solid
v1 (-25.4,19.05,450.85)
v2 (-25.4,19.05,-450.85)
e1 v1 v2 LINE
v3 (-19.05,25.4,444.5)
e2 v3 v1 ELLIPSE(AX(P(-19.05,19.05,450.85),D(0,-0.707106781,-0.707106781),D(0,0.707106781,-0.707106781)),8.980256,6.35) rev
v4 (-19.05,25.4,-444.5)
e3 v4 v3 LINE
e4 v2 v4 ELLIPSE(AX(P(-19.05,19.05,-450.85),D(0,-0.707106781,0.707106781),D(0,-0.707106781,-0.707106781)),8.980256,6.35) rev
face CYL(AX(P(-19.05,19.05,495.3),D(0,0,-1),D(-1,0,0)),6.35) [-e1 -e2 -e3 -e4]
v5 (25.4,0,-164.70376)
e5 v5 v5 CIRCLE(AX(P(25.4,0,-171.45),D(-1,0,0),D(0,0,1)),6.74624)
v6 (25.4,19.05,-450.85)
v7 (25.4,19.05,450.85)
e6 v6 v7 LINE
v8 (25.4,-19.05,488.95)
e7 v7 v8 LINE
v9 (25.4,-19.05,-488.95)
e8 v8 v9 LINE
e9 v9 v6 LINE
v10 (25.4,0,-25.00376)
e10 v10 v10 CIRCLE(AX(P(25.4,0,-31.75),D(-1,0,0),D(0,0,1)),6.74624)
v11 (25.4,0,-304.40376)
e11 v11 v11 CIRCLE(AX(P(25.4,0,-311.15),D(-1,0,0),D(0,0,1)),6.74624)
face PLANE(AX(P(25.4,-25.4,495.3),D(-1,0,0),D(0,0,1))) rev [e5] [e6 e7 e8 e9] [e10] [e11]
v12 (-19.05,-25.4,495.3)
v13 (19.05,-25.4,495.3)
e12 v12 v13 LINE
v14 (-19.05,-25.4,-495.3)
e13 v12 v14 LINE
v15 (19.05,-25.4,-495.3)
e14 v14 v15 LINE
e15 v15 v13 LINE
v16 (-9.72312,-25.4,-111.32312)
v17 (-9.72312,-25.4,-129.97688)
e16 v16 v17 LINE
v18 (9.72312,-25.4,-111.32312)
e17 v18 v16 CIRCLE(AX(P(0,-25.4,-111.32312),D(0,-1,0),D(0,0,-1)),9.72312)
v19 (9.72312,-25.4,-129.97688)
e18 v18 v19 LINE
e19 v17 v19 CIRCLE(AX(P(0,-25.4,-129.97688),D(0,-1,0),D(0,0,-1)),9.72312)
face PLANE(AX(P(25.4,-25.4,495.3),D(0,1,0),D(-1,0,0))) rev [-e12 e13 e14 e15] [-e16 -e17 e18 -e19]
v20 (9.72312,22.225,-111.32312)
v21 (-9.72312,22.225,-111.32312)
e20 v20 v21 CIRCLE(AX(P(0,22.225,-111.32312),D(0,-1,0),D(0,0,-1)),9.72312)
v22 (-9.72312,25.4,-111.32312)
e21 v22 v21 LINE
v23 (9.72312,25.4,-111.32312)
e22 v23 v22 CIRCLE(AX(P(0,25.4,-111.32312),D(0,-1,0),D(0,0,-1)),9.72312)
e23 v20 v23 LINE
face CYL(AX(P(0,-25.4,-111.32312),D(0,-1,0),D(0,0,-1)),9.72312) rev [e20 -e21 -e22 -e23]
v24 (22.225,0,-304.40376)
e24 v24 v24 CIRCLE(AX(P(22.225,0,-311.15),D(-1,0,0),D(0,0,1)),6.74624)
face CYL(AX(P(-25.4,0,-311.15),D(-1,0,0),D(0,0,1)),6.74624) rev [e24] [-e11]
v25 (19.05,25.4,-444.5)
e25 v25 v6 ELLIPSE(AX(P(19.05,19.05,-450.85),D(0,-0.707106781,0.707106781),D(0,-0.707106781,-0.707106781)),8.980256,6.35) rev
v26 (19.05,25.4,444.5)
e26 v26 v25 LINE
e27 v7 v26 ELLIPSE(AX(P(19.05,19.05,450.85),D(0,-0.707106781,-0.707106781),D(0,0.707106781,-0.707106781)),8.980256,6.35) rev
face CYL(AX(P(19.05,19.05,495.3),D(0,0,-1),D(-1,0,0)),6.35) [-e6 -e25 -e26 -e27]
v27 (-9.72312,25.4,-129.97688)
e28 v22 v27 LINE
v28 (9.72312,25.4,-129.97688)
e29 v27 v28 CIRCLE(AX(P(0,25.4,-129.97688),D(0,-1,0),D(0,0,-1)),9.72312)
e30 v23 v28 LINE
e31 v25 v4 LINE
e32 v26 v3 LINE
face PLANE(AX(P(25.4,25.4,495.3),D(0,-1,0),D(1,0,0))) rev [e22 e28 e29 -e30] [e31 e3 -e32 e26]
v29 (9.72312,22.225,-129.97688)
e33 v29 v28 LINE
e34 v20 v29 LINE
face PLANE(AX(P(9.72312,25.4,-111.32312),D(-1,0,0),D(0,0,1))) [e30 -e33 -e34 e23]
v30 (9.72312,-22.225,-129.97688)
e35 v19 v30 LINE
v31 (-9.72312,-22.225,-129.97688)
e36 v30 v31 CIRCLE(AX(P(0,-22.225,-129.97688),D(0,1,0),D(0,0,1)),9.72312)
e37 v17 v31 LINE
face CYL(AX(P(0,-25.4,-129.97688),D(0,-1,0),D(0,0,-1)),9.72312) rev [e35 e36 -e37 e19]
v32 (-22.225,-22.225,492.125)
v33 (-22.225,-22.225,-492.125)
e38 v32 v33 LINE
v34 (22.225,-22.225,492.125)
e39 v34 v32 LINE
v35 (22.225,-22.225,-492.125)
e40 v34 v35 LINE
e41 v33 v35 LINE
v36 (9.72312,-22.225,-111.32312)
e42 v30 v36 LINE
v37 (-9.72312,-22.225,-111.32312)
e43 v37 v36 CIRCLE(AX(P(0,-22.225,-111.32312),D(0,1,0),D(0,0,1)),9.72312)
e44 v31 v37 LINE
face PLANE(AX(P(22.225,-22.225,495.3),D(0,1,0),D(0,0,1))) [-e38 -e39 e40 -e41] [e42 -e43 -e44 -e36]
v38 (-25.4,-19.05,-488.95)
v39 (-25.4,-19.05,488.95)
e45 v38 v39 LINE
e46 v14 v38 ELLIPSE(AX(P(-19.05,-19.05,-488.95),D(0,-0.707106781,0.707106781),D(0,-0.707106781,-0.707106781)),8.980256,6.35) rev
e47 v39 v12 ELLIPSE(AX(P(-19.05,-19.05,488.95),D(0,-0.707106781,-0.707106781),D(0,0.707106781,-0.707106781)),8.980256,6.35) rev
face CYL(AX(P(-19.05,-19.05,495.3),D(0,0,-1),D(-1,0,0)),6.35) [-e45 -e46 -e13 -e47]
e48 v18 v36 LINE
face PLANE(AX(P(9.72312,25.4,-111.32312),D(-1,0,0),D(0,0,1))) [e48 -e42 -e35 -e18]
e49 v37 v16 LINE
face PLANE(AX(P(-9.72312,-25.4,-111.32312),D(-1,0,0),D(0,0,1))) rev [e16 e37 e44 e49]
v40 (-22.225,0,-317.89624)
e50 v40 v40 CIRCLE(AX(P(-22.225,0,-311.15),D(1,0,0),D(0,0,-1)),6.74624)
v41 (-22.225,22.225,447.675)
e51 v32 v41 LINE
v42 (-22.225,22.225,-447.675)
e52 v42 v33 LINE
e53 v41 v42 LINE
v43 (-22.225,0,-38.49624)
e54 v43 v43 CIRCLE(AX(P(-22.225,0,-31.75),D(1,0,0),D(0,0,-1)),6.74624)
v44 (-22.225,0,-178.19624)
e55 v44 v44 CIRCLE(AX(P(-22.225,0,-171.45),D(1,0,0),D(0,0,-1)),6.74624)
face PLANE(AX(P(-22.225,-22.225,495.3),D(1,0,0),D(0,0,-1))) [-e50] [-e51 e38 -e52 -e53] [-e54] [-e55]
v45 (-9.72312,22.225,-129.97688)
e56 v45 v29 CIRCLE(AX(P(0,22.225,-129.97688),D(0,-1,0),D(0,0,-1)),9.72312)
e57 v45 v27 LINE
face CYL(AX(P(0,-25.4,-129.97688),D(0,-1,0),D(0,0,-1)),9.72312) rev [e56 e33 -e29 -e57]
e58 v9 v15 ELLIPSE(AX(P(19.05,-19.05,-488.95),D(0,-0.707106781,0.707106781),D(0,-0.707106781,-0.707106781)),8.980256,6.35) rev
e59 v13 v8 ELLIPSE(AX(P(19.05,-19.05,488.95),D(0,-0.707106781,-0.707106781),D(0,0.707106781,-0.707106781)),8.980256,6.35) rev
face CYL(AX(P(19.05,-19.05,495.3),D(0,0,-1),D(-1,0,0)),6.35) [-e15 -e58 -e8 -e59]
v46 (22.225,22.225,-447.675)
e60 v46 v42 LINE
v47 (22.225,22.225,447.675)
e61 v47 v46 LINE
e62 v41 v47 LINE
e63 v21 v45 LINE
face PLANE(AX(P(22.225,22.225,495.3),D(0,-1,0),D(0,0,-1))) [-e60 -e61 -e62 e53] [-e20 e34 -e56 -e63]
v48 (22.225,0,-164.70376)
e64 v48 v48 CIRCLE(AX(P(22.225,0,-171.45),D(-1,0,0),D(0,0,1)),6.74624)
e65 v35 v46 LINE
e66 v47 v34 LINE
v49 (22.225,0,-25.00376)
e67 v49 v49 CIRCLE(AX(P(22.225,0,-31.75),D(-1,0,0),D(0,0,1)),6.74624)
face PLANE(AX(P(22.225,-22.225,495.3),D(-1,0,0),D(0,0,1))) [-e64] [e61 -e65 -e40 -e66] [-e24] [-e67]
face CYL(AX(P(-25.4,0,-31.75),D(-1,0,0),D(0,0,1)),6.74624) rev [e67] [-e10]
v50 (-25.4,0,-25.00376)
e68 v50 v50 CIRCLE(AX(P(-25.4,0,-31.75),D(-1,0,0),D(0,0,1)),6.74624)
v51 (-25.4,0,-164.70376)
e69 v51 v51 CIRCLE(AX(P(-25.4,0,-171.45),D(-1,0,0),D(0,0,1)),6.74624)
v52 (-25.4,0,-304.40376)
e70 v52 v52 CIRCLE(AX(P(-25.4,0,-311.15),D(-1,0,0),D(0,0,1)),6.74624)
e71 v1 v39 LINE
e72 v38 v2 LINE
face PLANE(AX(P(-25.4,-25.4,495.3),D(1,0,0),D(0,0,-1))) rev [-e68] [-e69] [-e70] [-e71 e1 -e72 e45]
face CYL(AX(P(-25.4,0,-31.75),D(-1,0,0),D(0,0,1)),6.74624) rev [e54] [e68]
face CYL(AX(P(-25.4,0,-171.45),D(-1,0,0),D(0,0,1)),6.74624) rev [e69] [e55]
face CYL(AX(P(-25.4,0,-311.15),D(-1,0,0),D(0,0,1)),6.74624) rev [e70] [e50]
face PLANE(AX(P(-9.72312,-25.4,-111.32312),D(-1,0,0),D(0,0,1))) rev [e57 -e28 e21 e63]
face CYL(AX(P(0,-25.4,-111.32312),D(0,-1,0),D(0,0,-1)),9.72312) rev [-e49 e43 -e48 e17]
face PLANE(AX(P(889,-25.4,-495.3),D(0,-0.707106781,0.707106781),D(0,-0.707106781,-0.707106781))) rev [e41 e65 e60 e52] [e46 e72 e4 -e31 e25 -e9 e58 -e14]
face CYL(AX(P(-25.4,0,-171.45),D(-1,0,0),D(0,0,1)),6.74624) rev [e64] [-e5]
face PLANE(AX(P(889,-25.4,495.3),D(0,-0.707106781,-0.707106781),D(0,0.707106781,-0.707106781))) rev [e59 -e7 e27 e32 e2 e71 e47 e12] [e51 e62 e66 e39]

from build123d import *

# Parameters (mm, degrees)
SKETCH1_W                   = 50.8
SKETCH1_H                   = 50.8
SKETCH1_W_2                 = 44.45
SKETCH1_H_2                 = 44.45
BOSS_EXTRUDE1_DEPTH         = 495.3
FILLET1_R                   = 6.35
CUT_EXTRUDE1_DEPTH          = 914.4
F_1_2_CLEARANCE_HOLE1_D     = 13.49248
F_3_4_START                 = -25.4
F_3_4_CLEARANCE_SLOT1_DEPTH = 50.8


# Read off the part's stored shape, not the designer's step: 3/4 Clearance Slot1
with BuildPart() as part:
    # Sketch1 → Boss-Extrude1 (new, symmetric)
    with BuildSketch(Plane.XY):
        Rectangle(SKETCH1_W, SKETCH1_H)
        Rectangle(SKETCH1_W_2, SKETCH1_H_2, mode=Mode.SUBTRACT)
    extrude(amount=BOSS_EXTRUDE1_DEPTH, both=True)

    # Fillet1
    fillet1_edges = [part.edges().sort_by_distance(p)[0] for p in [
        (-25.4, 25.4, 0),
        (25.4, 25.4, 0),
        (25.4, -25.4, 0),
        (-25.4, -25.4, 0),
    ]]
    fillet(fillet1_edges, radius=FILLET1_R)

    # Sketch2 → Cut-Extrude1 (cut)
    with BuildSketch(Plane.ZY.offset(25.4)):
        Polygon((495.3, -25.4), (444.5, 25.4), (495.3, 25.4), align=None)
        Polygon((-495.3, 25.4), (-495.3, -25.4), (-444.5, 25.4), align=None)
    extrude(amount=-CUT_EXTRUDE1_DEPTH, mode=Mode.SUBTRACT)

    # 1/2 Clearance Hole1 (through all)
    with Locations(Plane.ZY.offset(25.4)):
        with Locations((-171.45, 0), (-311.15, 0), (-31.75, 0)):
            Hole(F_1_2_CLEARANCE_HOLE1_D / 2)

    # 3/4 Clearance Slot1 outline → 3/4 Clearance Slot1 (cut)
    with BuildSketch(Plane(origin=(0, 0, 0), x_dir=(1, 0, 0), z_dir=(0, 1, 0)).offset(F_3_4_START)):
        with BuildLine():
            ThreePointArc((9.72312, 129.97688), (0, 139.7), (-9.72312, 129.97688))
            Line((-9.72312, 129.97688), (-9.72312, 111.32312))
            ThreePointArc((-9.72312, 111.32312), (0, 101.6), (9.72312, 111.32312))
            Line((9.72312, 111.32312), (9.72312, 129.97688))
        make_face()
    extrude(amount=F_3_4_CLEARANCE_SLOT1_DEPTH, mode=Mode.SUBTRACT)


solid = part.part
